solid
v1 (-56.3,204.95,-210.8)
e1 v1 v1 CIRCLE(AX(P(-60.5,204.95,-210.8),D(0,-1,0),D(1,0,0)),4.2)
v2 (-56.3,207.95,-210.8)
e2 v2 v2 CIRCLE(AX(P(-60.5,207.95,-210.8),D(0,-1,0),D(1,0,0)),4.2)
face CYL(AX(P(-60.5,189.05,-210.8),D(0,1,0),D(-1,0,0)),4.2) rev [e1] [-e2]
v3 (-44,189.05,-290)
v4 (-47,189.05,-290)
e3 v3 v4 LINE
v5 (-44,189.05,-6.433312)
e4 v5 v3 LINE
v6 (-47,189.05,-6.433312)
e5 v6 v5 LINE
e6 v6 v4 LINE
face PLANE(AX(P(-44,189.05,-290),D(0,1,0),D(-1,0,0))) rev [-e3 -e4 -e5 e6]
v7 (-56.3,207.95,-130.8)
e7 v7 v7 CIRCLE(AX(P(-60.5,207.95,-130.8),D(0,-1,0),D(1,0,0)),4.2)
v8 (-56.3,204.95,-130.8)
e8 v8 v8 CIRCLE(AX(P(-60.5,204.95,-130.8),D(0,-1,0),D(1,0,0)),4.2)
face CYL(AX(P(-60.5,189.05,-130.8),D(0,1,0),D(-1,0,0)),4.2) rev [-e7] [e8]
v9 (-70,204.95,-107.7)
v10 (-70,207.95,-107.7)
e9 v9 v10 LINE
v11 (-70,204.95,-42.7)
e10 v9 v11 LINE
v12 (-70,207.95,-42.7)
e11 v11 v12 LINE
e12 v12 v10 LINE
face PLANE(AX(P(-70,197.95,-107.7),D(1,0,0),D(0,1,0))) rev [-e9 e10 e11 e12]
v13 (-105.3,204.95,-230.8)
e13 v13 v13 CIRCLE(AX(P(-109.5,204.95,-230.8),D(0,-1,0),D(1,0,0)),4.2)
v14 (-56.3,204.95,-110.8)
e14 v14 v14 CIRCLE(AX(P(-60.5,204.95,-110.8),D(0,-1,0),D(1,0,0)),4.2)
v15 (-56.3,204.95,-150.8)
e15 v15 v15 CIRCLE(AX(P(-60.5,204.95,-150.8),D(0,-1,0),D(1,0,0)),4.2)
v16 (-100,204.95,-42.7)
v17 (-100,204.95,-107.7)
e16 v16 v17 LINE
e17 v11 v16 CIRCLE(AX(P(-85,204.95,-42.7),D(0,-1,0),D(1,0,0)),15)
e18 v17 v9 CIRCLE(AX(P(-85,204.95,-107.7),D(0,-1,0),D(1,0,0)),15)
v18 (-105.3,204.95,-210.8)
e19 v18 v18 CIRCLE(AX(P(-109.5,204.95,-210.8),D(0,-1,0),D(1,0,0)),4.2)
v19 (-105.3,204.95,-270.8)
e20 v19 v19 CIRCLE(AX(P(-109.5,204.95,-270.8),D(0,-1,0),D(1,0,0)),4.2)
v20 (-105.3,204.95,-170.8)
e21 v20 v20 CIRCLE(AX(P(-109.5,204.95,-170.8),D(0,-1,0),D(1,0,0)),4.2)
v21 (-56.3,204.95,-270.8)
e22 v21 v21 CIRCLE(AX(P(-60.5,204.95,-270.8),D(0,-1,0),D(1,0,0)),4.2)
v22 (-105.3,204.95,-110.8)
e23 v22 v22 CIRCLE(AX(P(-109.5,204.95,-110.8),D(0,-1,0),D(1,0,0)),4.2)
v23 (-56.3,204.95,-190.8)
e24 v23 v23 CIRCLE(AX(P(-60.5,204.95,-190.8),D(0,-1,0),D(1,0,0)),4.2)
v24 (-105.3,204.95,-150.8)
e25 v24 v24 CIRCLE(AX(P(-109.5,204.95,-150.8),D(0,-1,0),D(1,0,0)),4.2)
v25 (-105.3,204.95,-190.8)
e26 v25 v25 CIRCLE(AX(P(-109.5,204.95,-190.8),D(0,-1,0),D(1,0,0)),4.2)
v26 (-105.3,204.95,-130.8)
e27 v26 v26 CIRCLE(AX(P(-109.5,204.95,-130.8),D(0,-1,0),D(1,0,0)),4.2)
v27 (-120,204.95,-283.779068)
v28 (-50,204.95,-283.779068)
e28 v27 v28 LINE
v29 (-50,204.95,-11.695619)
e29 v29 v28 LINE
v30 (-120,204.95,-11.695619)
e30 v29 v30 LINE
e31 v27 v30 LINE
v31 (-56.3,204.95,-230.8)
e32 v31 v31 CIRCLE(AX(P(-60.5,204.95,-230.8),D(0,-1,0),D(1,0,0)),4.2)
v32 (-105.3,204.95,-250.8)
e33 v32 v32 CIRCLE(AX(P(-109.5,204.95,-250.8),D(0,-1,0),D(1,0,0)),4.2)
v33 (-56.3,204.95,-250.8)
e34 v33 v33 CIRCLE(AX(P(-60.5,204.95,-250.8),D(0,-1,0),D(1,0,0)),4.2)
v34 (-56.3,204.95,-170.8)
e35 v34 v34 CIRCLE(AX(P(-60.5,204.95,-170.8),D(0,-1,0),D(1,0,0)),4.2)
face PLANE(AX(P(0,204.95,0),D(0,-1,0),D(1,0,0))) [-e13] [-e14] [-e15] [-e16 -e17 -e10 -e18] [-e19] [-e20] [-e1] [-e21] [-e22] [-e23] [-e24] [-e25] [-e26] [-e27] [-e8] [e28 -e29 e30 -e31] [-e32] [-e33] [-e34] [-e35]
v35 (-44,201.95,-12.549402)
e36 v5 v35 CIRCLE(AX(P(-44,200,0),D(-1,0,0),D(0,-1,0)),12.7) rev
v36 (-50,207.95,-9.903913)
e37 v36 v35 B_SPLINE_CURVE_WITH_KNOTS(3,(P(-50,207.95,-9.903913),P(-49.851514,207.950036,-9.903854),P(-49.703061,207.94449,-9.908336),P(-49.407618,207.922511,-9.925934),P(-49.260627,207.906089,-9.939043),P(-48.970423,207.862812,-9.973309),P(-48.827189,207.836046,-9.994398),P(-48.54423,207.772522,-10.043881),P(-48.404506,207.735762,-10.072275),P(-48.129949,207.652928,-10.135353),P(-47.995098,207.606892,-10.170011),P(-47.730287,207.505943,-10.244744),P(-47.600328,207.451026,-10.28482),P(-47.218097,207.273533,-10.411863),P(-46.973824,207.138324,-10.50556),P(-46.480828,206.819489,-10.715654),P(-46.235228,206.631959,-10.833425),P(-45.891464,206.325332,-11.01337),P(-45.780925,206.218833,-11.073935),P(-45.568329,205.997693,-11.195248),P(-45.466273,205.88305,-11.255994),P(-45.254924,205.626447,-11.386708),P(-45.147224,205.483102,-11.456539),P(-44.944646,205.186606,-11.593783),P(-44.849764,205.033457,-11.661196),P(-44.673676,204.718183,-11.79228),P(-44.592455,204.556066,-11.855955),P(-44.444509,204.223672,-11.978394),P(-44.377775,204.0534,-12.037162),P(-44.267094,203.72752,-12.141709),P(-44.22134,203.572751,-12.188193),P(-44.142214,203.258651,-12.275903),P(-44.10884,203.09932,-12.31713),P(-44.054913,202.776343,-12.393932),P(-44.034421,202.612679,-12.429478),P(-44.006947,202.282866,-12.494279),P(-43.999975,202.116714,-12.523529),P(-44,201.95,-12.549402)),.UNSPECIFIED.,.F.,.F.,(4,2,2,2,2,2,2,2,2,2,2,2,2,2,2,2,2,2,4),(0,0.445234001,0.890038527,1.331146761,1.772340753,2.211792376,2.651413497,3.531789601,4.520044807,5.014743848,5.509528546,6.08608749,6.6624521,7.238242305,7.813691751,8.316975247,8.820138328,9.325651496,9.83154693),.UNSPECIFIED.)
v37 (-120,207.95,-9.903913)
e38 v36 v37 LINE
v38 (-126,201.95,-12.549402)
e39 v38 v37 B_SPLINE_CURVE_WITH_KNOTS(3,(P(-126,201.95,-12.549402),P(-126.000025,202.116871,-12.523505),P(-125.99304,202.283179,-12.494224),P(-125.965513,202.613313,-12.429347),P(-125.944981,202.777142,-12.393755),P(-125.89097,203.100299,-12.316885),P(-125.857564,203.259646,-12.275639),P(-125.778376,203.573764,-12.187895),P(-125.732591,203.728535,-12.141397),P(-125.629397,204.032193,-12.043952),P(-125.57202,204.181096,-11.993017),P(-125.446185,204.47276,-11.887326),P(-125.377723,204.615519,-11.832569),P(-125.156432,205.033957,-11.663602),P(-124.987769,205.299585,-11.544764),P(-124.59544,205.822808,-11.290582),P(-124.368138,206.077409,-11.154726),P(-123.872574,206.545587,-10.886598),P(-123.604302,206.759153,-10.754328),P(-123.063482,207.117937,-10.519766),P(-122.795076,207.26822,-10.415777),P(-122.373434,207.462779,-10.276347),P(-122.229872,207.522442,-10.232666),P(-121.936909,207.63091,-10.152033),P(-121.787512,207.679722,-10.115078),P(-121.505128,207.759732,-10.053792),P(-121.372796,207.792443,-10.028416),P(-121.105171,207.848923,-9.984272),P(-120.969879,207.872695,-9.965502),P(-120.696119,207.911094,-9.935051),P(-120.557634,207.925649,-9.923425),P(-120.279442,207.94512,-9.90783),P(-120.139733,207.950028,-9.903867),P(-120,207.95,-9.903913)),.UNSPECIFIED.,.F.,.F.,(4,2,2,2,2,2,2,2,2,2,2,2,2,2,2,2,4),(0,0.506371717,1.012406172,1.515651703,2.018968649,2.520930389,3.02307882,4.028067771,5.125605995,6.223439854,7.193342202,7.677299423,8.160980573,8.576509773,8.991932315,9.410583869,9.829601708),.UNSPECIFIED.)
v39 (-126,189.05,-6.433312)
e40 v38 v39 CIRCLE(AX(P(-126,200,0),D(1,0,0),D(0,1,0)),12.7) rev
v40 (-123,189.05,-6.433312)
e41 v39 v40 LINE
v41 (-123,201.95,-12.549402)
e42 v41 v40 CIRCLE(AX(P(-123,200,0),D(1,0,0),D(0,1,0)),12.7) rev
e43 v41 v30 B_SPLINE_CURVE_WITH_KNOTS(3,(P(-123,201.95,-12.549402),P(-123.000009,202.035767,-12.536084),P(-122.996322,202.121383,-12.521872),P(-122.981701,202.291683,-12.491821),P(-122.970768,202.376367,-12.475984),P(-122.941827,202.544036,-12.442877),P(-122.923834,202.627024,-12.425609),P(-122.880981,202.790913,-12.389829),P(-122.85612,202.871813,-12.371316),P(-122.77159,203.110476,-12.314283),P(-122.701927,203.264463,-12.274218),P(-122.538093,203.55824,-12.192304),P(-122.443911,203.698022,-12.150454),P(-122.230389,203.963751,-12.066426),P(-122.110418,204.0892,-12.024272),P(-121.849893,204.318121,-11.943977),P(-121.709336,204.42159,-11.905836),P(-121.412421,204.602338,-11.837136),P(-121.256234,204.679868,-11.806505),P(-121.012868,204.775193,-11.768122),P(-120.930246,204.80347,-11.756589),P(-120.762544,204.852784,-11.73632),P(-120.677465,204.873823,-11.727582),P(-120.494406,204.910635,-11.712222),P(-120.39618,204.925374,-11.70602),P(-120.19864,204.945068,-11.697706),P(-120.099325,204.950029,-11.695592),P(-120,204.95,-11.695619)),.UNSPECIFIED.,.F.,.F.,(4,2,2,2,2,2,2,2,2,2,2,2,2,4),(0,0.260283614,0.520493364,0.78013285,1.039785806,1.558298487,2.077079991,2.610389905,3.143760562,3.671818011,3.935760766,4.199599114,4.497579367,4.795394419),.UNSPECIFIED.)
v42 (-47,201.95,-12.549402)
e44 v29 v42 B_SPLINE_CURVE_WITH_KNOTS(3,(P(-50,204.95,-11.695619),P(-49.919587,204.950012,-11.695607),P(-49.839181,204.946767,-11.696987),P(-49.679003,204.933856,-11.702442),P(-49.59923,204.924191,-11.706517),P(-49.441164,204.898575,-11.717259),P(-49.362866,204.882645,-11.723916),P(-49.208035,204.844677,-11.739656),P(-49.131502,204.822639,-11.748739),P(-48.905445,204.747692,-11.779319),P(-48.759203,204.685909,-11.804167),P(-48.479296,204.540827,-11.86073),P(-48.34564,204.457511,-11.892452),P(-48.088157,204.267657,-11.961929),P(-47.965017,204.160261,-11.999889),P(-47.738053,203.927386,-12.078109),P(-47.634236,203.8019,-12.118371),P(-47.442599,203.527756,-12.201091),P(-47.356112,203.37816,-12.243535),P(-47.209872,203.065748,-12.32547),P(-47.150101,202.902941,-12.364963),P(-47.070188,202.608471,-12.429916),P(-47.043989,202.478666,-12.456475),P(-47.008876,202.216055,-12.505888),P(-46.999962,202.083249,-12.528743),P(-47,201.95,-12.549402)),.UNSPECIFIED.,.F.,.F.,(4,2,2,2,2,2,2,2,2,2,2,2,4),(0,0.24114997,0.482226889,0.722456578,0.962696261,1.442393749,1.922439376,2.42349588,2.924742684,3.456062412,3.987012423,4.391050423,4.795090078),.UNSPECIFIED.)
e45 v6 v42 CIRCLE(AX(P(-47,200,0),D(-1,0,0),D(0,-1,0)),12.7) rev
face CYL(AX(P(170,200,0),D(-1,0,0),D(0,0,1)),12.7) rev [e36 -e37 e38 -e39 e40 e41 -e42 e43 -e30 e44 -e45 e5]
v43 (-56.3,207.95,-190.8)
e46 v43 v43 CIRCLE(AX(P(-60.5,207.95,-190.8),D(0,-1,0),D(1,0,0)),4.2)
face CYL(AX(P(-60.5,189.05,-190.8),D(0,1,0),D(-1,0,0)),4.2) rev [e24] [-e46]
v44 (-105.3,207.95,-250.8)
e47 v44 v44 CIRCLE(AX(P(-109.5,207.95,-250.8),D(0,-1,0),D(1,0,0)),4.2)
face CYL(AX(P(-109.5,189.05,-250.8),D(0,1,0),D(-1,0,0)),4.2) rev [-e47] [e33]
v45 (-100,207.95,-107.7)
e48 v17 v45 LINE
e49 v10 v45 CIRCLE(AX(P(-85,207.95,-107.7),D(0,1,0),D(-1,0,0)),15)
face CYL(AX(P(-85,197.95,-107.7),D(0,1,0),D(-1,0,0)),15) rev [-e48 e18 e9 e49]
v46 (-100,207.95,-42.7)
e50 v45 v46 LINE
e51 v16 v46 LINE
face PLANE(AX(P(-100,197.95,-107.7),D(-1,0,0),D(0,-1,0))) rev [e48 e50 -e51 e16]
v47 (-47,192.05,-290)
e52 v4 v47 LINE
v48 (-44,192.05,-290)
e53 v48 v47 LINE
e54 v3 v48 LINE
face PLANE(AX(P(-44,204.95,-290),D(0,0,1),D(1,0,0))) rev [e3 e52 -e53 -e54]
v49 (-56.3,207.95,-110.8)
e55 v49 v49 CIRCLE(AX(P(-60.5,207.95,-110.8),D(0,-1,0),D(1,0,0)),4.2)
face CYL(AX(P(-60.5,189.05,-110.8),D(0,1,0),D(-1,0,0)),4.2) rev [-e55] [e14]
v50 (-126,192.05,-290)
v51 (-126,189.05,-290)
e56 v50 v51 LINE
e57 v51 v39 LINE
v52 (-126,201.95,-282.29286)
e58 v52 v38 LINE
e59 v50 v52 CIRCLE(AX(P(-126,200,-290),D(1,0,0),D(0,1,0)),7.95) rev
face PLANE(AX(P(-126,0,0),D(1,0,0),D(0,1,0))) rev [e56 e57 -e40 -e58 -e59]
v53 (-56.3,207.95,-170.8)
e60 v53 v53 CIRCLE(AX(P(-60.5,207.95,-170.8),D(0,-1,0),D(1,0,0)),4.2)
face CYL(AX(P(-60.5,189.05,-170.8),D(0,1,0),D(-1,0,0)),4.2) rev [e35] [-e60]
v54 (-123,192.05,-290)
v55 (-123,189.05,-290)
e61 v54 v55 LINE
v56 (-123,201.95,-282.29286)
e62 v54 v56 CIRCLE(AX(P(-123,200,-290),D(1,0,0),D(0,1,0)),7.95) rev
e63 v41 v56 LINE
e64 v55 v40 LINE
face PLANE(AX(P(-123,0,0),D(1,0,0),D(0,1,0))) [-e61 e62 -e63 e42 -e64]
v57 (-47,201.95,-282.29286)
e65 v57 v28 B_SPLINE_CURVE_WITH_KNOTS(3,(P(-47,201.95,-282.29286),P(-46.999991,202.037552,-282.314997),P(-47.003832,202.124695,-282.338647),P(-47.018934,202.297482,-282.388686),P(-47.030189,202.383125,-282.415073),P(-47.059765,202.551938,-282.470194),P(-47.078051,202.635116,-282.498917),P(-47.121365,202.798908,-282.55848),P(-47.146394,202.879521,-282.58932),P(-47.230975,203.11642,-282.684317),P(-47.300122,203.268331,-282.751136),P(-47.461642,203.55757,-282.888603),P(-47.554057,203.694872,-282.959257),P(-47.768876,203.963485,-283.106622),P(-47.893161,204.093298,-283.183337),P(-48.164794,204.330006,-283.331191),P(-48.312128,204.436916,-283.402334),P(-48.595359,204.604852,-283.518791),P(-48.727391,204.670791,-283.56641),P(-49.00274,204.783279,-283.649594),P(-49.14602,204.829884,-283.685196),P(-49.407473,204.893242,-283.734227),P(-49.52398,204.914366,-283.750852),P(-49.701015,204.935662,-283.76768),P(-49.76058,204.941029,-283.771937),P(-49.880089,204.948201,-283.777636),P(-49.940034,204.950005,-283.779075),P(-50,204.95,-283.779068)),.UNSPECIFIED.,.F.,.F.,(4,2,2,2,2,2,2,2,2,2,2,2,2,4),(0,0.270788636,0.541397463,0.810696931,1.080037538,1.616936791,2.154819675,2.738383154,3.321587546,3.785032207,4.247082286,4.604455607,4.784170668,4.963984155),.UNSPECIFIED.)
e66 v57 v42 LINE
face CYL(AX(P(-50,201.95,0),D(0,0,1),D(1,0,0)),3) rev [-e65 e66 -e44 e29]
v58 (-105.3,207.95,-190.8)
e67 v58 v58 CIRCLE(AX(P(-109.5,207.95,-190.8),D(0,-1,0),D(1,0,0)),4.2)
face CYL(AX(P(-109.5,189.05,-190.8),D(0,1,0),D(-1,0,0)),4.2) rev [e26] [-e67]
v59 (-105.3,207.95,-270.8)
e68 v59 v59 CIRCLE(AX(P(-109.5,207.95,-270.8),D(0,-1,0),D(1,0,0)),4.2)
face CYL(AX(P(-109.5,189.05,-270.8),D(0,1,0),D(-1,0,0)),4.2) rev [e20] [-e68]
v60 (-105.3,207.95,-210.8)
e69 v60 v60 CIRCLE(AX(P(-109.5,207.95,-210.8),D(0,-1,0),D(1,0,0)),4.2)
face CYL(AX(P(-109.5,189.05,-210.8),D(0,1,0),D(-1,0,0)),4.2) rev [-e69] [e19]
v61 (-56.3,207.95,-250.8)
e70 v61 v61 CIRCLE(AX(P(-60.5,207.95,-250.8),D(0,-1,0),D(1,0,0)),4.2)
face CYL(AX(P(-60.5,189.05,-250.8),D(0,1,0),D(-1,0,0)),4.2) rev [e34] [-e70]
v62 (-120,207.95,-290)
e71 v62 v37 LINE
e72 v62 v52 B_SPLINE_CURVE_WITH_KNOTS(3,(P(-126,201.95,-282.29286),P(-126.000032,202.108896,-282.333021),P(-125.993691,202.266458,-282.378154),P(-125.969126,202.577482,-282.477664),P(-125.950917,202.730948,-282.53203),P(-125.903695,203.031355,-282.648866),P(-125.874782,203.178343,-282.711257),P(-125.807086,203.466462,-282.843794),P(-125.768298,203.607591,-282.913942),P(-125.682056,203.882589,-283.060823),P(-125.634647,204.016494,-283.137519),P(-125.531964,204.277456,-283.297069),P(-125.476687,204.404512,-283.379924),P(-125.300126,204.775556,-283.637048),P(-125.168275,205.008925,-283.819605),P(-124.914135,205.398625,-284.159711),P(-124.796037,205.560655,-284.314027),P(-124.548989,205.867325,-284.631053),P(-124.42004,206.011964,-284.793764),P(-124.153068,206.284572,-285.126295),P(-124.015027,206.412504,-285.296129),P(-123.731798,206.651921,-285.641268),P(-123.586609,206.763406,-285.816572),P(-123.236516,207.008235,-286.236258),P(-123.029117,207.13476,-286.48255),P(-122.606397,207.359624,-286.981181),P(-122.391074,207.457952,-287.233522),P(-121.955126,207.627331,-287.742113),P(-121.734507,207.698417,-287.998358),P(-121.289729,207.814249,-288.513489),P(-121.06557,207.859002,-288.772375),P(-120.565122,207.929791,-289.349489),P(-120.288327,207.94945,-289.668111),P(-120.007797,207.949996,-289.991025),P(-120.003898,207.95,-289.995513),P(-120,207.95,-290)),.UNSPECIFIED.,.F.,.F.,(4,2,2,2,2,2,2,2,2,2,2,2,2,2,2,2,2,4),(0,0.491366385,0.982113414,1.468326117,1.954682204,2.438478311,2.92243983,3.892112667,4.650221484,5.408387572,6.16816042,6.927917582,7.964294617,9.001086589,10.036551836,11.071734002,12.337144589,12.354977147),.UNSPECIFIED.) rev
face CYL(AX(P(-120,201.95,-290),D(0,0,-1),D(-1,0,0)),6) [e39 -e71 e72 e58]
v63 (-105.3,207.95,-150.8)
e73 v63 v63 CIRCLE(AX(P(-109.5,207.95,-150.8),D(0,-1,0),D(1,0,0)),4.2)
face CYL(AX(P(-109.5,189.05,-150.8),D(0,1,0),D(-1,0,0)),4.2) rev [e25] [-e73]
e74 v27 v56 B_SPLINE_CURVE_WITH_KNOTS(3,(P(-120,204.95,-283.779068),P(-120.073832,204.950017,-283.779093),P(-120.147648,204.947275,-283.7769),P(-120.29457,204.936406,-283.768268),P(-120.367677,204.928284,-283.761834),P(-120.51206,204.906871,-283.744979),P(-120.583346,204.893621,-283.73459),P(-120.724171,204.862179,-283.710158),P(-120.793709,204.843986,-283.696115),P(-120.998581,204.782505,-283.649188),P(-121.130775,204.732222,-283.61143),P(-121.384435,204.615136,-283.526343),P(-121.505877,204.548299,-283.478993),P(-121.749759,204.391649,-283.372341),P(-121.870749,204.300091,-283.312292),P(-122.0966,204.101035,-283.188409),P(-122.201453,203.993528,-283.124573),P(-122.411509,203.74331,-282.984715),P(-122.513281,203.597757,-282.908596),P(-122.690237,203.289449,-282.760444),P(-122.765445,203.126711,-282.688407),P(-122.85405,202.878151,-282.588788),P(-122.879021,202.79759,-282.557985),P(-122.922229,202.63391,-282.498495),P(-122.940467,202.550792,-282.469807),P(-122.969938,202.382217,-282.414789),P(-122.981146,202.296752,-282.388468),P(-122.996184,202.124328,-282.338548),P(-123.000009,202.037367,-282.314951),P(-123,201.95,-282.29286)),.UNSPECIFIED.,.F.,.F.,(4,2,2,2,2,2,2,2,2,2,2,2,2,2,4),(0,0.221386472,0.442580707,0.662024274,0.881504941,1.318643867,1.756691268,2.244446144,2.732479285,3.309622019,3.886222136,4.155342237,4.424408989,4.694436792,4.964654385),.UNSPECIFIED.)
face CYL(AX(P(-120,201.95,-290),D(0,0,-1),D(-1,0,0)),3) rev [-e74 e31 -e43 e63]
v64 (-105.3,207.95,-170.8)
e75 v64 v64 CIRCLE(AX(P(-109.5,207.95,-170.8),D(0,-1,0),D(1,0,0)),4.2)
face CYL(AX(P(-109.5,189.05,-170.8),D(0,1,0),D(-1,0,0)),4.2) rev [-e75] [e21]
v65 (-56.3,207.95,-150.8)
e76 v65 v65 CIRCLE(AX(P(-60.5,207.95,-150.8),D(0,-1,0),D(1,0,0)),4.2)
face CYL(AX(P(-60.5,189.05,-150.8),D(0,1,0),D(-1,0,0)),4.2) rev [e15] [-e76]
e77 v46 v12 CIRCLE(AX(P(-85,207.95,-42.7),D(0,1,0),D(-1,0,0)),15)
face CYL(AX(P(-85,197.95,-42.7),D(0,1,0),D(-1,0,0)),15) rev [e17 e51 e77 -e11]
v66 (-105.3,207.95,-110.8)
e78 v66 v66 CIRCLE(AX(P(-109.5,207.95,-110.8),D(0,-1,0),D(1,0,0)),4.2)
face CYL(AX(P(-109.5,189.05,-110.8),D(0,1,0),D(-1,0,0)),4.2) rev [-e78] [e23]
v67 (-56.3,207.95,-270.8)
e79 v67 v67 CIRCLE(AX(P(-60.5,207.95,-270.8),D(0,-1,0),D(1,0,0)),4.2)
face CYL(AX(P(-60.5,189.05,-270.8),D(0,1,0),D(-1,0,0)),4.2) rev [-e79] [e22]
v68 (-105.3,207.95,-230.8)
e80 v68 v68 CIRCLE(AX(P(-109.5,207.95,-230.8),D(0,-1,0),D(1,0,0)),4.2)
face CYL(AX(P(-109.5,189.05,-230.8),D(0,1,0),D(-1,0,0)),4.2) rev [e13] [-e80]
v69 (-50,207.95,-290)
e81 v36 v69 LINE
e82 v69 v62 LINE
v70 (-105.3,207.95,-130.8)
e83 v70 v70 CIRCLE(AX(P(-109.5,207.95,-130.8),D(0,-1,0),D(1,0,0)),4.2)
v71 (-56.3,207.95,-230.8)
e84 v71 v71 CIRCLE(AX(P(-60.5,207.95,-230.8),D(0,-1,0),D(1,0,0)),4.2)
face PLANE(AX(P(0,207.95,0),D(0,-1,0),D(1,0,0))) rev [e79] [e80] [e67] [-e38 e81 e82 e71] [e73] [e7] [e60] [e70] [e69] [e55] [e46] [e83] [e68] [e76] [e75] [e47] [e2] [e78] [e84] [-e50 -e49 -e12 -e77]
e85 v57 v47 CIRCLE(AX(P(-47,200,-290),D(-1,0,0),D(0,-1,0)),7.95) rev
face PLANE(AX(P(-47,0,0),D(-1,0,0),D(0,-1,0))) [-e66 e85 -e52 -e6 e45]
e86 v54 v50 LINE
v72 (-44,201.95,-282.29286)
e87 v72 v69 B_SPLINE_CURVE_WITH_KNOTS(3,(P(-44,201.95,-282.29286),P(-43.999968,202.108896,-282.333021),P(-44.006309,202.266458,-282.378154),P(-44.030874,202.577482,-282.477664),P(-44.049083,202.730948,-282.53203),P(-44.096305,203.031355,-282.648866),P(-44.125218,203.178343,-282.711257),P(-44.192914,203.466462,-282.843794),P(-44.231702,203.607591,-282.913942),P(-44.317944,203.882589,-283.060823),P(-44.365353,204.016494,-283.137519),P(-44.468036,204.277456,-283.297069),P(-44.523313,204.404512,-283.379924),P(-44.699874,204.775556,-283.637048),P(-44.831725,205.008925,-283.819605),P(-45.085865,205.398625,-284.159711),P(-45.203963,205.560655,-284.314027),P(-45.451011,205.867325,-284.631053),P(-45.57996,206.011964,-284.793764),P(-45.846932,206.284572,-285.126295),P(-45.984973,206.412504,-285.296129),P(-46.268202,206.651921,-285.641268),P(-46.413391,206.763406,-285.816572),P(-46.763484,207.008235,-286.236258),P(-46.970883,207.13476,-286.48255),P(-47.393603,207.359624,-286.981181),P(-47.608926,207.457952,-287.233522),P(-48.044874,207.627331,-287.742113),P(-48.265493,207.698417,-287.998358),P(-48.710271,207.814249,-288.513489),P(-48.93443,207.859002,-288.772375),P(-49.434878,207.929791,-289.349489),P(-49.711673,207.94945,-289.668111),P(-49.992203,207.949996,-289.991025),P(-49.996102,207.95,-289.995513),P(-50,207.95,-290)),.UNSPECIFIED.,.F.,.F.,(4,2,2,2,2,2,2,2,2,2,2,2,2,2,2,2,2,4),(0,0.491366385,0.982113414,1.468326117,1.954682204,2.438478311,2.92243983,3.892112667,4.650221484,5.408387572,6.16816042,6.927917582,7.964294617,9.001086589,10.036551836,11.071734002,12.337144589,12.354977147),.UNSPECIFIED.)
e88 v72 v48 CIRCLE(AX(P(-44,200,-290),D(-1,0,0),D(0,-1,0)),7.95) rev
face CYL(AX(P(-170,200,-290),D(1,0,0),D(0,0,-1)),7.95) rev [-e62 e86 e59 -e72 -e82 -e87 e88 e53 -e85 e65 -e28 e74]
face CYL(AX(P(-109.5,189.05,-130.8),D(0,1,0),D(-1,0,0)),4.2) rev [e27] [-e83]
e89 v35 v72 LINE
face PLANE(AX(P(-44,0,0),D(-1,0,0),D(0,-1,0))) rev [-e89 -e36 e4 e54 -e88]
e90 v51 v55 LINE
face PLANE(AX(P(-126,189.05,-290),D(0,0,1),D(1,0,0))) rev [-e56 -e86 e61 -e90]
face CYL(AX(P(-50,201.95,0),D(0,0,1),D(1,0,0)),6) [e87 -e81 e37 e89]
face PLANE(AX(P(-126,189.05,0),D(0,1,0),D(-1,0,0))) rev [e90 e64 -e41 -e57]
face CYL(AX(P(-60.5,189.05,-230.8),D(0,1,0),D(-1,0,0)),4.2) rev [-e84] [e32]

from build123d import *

# Parameters (mm, degrees)
SKETCH1_W                   = 70
SKETCH1_H                   = 290
BASE_FLANGE1_DEPTH          = 3
SM_EDGE_FLANGE_1_DEPTH      = 290
SM_EDGE_FLANGE_1_BEND_DEPTH = 290
INDENT1_START               = -127
INDENT1_DEPTH               = 84
INDENT1_START_2             = -123.729611107
INDENT1_2_DEPTH             = 77.459222009
INDENT1_3_DEPTH             = 0.729611107
INDENT1_START_3             = -47
INDENT1_4_DEPTH             = 0.729610902
INDENT1_START_4             = -50.0000001
INDENT1_5_DEPTH             = 6.0000001
INDENT1_START_5             = -126
INDENT1_6_DEPTH             = 6
INDENT1_START_6             = -290
INDENT1_7_DEPTH             = 6.65
INDENT2_START               = -127
INDENT2_DEPTH               = 84
INDENT2_START_2             = -11.0000001
INDENT2_2_DEPTH             = 11.0000001
INDENT2_START_3             = -126
INDENT2_3_DEPTH             = 82
CUT_EXTRUDE1_DEPTH          = 317.754179273
CUT_EXTRUDE1_DEPTH_BACK     = 317.754179273
SKETCH12_R                  = 4.2
CUT_EXTRUDE2_DEPTH          = 10


with BuildPart() as part:
    # Base-Flange1: sheet metal written as solids
    # Sketch1 → Base-Flange1 (new body)
    with BuildSketch(Plane(origin=(0, 207.95, 0), x_dir=(1, 0, 0), z_dir=(0, 1, 0))):
        with Locations((-85, 145)):
            Rectangle(SKETCH1_W, SKETCH1_H)
    extrude(amount=-BASE_FLANGE1_DEPTH)

    # 邊線-凸緣1: sheet metal written as solids
    # 邊線-凸緣1 section (on a plane across the edge) → 邊線-凸緣1 (add)
    with BuildSketch(Plane(origin=(-47, 204.95, -290), x_dir=(-1, 0, 0), z_dir=(0, 0, 1))):
        with BuildLine():
            Line((-3, 3), (-3, 15.9))
            Line((-3, 15.9), (0, 15.9))
            Line((0, 15.9), (0, 3))
            ThreePointArc((0, 3), (0.878679656, 0.878679656), (3, 0))
            Line((3, 0), (3, -3))
            ThreePointArc((3, -3), (-1.242640687, -1.242640687), (-3, 3))
        make_face()
    extrude(amount=SM_EDGE_FLANGE_1_DEPTH)

    # 邊線-凸緣1 section 2 (on a plane across the edge) → 邊線-凸緣1 bend (add)
    with BuildSketch(Plane(origin=(-123, 204.95, 0), x_dir=(1, 0, 0), z_dir=(0, 0, -1))):
        with BuildLine():
            Line((-3, 3), (-3, 15.9))
            Line((-3, 15.9), (0, 15.9))
            Line((0, 15.9), (0, 3))
            ThreePointArc((0, 3), (0.878679656, 0.878679656), (3, 0))
            Line((3, 0), (3, -3))
            ThreePointArc((3, -3), (-1.242640687, -1.242640687), (-3, 3))
        make_face()
    extrude(amount=SM_EDGE_FLANGE_1_BEND_DEPTH)

    # Indent1: read off the stored shape, not the designer's step
    # Indent1 outline → Indent1 (cut)
    with BuildSketch(Plane.YZ.offset(INDENT1_START)):
        with BuildLine():
            Line((192.05, -290), (207.95, -290))
            ThreePointArc((207.95, -290), (200, -282.05), (192.05, -290))
        make_face()
    extrude(amount=INDENT1_DEPTH, mode=Mode.SUBTRACT)

    # Indent2: read off the stored shape, not the designer's step
    # Indent2 outline → Indent2 (cut)
    with BuildSketch(Plane.YZ.offset(INDENT2_START)):
        with BuildLine():
            ThreePointArc((189.05, -6.433311744), (197.7062633, -12.491147744), (207.950014124, -9.903902031))
            Line((207.950014124, -9.903902031), (209, -9.061062257))
            Line((209, -9.061062257), (209, 1))
            Line((209, 1), (188, 1))
            Line((188, 1), (188, 0))
            Line((188, 0), (188, -4.64612958))
            Line((188, -4.64612958), (189.05, -6.433311744))
        make_face()
    extrude(amount=INDENT2_DEPTH, mode=Mode.SUBTRACT)

    # Sketch12 → Cut-Extrude1 (cut, two sides: drawn at the far end of the back side and taken through both)
    with BuildSketch(Plane(origin=(0, 207.95, 0), x_dir=(1, 0, 0), z_dir=(0, 1, 0)).offset(-CUT_EXTRUDE1_DEPTH_BACK)):
        with Locations((-109.5, 270.8)):
            Circle(SKETCH12_R)
        with Locations((-60.5, 270.8)):
            Circle(SKETCH12_R)
        with Locations((-60.5, 250.8)):
            Circle(SKETCH12_R)
        with Locations((-109.5, 250.8)):
            Circle(SKETCH12_R)
        with Locations((-60.5, 230.8)):
            Circle(SKETCH12_R)
        with Locations((-109.5, 230.8)):
            Circle(SKETCH12_R)
        with Locations((-60.5, 210.8)):
            Circle(SKETCH12_R)
        with Locations((-109.5, 210.8)):
            Circle(SKETCH12_R)
        with Locations((-60.5, 190.8)):
            Circle(SKETCH12_R)
        with Locations((-109.5, 190.8)):
            Circle(SKETCH12_R)
        with Locations((-60.5, 170.8)):
            Circle(SKETCH12_R)
        with Locations((-109.5, 170.8)):
            Circle(SKETCH12_R)
        with Locations((-60.5, 150.8)):
            Circle(SKETCH12_R)
        with Locations((-109.5, 150.8)):
            Circle(SKETCH12_R)
        with Locations((-60.5, 130.8)):
            Circle(SKETCH12_R)
        with Locations((-109.5, 130.8)):
            Circle(SKETCH12_R)
        with Locations((-60.5, 110.8)):
            Circle(SKETCH12_R)
        with Locations((-109.5, 110.8)):
            Circle(SKETCH12_R)
    extrude(amount=CUT_EXTRUDE1_DEPTH + CUT_EXTRUDE1_DEPTH_BACK, mode=Mode.SUBTRACT)

    # Sketch13 → Cut-Extrude2 (cut)
    with BuildSketch(Plane(origin=(0, 207.95, 0), x_dir=(1, 0, 0), z_dir=(0, 1, 0))):
        with BuildLine():
            Line((-70, 107.7), (-70, 42.7))
            ThreePointArc((-70, 42.7), (-85, 27.7), (-100, 42.7))
            Line((-100, 42.7), (-100, 107.7))
            ThreePointArc((-100, 107.7), (-85, 122.7), (-70, 107.7))
        make_face()
    extrude(amount=-CUT_EXTRUDE2_DEPTH, mode=Mode.SUBTRACT)


with BuildPart() as body_2:
    # Indent1 2 outline → Indent1 2 (new body)
    with BuildSketch(Plane.YZ.offset(INDENT1_START_2)):
        with BuildLine():
            Line((204.95, -285.559279338), (204.95, -290))
            Line((204.95, -290), (206.65, -290))
            ThreePointArc((206.65, -290), (206.210475022, -287.622501314), (204.95, -285.559279338))
        make_face()
    extrude(amount=INDENT1_2_DEPTH)

    # Indent1 3 outline → Indent1 3 (add)
    with BuildSketch(Plane.YZ.offset(INDENT1_START_2)):
        with BuildLine():
            Line((193.35, -290), (204.95, -290))
            Line((204.95, -290), (204.95, -285.559279338))
            ThreePointArc((204.95, -285.559279338), (197.622501314, -283.789524978), (193.35, -290))
        make_face()
    extrude(amount=INDENT1_3_DEPTH)

    # Indent1 4 outline → Indent1 4 (add)
    with BuildSketch(Plane.YZ.offset(INDENT1_START_3)):
        with BuildLine():
            Line((193.35, -290), (204.95, -290))
            Line((204.95, -290), (204.95, -285.559279338))
            ThreePointArc((204.95, -285.559279338), (197.622501314, -283.789524978), (193.35, -290))
        make_face()
    extrude(amount=INDENT1_4_DEPTH)

    # Indent1 5 outline → Indent1 5 (add)
    with BuildSketch(Plane.YZ.offset(INDENT1_START_4)):
        with BuildLine():
            Line((193.35, -290), (206.65, -290))
            ThreePointArc((206.65, -290), (200, -283.35), (193.35, -290))
        make_face()
    extrude(amount=INDENT1_5_DEPTH)

    # Indent1 6 outline → Indent1 6 (add)
    with BuildSketch(Plane.YZ.offset(INDENT1_START_5)):
        with BuildLine():
            Line((193.35, -290), (206.65, -290))
            ThreePointArc((206.65, -290), (200, -283.35), (193.35, -290))
        make_face()
    extrude(amount=INDENT1_6_DEPTH)

    # Indent1 7 outline → Indent1 7 (cut)
    with BuildSketch(Plane.XY.offset(INDENT1_START_6)):
        with BuildLine():
            Line((-47, 192), (-47, 201.95))
            ThreePointArc((-47, 201.95), (-47.878679656, 204.071320344), (-50, 204.95))
            Line((-50, 204.95), (-50.0000001, 192))
            Line((-50.0000001, 192), (-47, 192))
        make_face()
        with BuildLine():
            Line((-123, 192), (-120, 192))
            Line((-120, 192), (-120, 204.95))
            ThreePointArc((-120, 204.95), (-122.121320344, 204.071320344), (-123, 201.95))
            Line((-123, 201.95), (-123, 192))
        make_face()
        with BuildLine():
            ThreePointArc((-46.270396534, 206.650006169), (-44.597333029, 204.559825589), (-44, 201.95))
            Line((-44, 201.95), (-44, 208))
            Line((-44, 208), (-47.971644239, 208))
            Line((-47.971644239, 208), (-46.270396534, 206.650006169))
        make_face()
        with BuildLine():
            Line((-126, 208), (-126, 201.95))
            ThreePointArc((-126, 201.95), (-125.402668364, 204.559822705), (-123.729608483, 206.650002187))
            Line((-123.729608483, 206.650002187), (-122.028359489, 208))
            Line((-122.028359489, 208), (-126, 208))
        make_face()
    extrude(amount=INDENT1_7_DEPTH, mode=Mode.SUBTRACT)


with BuildPart() as body_3:
    # Indent2 2 outline → Indent2 2 (new body)
    with BuildSketch(Plane.XY.offset(INDENT2_START_2)):
        with BuildLine():
            Line((-44, 189.05), (-44, 201.95))
            ThreePointArc((-44, 201.95), (-45.757359313, 206.192640687), (-50, 207.95))
            Line((-50, 207.95), (-120, 207.95))
            ThreePointArc((-120, 207.95), (-124.242640687, 206.192640687), (-126, 201.95))
            Line((-126, 201.95), (-126, 189.05))
            Line((-126, 189.05), (-123, 189.05))
            Line((-123, 189.05), (-123, 201.95))
            ThreePointArc((-123, 201.95), (-122.121320344, 204.071320344), (-120, 204.95))
            Line((-120, 204.95), (-50, 204.95))
            ThreePointArc((-50, 204.95), (-47.878679656, 204.071320344), (-47, 201.95))
            Line((-47, 201.95), (-47, 189.05))
            Line((-47, 189.05), (-44, 189.05))
        make_face()
    extrude(amount=INDENT2_2_DEPTH)

    # Indent2 3 outline → Indent2 3 (cut)
    with BuildSketch(Plane.YZ.offset(INDENT2_START_3)):
        with BuildLine():
            Line((207.95, -11.0000001), (207.950016725, -7.602449216))
            ThreePointArc((207.950016725, -7.602449216), (204.322791843, -10.115012145), (200.000000001, -11))
            Line((200.000000001, -11), (207.95, -11.0000001))
        make_face()
        with BuildLine():
            Line((189.05, -11.0000001), (200.000000001, -11))
            ThreePointArc((200.000000001, -11), (192.601479194, -8.140140655), (189.05, -1.047616342))
            Line((189.05, -1.047616342), (189.05, -11.0000001))
        make_face()
    extrude(amount=INDENT2_3_DEPTH, mode=Mode.SUBTRACT)


solid = part.part
